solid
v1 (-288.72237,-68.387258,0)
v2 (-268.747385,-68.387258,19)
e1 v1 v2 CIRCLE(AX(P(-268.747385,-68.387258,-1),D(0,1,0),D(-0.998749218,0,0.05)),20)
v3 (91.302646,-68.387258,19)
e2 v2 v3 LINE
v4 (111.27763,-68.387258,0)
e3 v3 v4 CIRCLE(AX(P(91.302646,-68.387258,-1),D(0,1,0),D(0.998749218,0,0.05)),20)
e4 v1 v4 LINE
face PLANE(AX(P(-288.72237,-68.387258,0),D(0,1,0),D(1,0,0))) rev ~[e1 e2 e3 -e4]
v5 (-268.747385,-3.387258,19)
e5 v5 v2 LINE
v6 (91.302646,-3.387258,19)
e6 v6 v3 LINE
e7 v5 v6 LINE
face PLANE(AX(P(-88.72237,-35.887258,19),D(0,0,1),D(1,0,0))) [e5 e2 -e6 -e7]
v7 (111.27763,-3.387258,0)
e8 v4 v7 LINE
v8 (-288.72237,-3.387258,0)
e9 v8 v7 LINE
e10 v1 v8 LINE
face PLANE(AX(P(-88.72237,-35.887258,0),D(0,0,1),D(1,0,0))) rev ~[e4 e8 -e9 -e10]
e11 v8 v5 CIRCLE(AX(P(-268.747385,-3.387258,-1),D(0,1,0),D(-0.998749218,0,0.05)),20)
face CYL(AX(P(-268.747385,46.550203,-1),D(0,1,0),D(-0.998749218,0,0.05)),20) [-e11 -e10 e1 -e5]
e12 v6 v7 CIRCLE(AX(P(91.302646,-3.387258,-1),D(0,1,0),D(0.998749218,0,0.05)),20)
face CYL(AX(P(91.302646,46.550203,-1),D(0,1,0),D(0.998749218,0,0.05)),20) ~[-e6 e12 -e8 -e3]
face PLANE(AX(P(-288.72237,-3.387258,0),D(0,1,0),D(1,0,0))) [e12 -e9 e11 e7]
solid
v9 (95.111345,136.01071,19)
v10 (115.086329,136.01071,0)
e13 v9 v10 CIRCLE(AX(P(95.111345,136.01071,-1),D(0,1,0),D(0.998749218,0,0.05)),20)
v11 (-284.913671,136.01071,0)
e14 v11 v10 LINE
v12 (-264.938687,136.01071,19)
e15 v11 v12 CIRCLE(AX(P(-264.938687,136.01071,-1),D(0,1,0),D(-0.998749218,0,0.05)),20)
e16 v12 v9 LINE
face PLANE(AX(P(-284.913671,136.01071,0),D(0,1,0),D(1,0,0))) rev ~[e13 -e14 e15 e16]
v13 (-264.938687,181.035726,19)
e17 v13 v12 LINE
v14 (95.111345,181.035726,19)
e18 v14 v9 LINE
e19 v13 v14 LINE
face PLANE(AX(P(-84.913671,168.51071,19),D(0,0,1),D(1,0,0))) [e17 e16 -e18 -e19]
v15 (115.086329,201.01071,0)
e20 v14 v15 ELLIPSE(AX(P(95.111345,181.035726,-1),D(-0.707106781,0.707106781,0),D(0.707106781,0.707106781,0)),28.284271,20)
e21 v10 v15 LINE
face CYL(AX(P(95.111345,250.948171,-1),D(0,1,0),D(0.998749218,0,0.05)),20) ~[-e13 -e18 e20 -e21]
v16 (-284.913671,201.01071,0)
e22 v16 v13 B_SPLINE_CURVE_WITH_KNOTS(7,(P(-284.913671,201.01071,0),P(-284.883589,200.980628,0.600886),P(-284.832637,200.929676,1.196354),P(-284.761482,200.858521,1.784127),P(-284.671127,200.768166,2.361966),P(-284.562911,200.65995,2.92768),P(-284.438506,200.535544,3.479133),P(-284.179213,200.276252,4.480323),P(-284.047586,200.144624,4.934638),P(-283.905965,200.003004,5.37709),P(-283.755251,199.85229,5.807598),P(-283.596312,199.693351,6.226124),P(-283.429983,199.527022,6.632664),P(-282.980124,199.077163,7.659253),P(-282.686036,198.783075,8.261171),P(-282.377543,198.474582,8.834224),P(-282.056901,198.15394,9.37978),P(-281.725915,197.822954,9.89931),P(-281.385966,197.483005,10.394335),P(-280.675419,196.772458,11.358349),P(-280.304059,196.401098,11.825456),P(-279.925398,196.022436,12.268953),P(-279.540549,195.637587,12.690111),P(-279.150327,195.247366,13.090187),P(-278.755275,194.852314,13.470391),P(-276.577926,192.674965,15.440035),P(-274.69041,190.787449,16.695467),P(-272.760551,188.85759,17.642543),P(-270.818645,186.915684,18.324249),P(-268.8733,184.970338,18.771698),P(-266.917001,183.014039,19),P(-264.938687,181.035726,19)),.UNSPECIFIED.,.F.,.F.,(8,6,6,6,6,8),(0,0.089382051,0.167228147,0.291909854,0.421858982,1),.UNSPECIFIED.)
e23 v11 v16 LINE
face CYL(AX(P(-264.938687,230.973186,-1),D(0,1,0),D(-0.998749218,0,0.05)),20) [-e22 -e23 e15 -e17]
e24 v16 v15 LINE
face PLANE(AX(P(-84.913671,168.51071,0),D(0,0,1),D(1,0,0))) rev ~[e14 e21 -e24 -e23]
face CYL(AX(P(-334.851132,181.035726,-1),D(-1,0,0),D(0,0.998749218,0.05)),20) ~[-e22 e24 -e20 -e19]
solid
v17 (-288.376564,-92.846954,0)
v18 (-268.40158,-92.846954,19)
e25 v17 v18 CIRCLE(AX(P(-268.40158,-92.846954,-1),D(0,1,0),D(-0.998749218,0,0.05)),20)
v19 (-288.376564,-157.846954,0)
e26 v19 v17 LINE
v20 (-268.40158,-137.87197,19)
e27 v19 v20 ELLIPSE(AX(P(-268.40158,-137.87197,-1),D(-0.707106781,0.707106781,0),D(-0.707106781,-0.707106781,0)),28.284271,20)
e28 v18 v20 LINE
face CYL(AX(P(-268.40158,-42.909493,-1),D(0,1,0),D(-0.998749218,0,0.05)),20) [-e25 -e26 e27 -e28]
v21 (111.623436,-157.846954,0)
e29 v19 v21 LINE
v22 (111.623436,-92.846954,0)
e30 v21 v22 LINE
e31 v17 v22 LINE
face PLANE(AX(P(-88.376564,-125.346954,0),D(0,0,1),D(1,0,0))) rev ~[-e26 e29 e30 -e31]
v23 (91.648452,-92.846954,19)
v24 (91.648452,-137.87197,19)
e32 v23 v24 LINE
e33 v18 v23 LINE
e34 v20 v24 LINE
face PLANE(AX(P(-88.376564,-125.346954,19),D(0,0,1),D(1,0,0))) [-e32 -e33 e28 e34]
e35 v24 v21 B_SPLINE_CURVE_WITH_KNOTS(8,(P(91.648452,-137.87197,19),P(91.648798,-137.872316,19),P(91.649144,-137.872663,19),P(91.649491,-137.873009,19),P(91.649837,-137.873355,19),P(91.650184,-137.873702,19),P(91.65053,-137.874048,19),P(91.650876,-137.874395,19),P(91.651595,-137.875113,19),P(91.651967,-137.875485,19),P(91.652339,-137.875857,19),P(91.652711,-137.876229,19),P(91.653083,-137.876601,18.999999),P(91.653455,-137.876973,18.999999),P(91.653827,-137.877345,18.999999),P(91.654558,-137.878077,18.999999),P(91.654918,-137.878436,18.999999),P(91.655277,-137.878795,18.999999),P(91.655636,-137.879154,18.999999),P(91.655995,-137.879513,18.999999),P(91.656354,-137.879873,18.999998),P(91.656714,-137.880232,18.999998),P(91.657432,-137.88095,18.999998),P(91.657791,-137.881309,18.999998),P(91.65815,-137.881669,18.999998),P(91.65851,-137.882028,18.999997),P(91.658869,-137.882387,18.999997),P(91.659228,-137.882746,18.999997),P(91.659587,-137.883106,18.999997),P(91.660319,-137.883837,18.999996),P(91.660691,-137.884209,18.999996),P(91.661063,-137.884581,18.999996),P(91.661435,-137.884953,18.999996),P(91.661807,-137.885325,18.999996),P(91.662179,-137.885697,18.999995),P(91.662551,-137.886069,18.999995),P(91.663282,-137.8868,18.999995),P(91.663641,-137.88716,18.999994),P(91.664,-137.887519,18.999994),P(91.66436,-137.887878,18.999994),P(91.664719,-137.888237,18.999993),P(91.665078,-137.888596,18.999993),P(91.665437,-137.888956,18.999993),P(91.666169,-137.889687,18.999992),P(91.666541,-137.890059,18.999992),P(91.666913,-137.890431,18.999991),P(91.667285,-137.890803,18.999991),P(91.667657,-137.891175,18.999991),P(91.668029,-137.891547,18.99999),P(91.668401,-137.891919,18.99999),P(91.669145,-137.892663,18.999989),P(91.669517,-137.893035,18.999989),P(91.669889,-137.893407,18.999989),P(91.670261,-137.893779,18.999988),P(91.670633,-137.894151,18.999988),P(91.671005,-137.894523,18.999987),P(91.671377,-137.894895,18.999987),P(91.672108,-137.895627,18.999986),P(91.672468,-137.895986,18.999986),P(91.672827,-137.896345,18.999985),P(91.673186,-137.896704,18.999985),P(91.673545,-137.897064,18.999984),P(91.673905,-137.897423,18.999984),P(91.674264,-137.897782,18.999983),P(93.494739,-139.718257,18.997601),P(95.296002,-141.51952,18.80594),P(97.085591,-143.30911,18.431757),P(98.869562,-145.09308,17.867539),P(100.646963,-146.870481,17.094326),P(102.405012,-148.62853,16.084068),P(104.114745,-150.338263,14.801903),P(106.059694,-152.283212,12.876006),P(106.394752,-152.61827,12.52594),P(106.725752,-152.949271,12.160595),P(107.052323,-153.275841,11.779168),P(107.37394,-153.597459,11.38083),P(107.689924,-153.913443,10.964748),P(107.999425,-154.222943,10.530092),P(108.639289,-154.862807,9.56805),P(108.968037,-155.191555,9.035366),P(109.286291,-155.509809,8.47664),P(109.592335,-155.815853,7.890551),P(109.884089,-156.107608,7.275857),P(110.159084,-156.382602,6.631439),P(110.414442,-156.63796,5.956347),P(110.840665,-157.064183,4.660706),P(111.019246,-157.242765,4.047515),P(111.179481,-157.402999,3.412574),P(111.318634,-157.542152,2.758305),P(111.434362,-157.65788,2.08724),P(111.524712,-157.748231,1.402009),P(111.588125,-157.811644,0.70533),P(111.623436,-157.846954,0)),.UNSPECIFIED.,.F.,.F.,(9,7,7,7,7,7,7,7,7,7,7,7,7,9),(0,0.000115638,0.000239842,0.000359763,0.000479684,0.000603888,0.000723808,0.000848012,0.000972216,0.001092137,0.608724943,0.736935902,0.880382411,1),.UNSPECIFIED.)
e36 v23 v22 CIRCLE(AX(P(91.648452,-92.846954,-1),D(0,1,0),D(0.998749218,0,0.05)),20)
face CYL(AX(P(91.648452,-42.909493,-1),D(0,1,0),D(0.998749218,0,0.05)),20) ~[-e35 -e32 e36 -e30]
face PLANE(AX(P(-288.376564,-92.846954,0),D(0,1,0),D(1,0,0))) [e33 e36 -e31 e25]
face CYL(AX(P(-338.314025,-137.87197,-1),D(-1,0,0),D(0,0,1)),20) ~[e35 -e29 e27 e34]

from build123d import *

# Parameters (mm, degrees)
F0_W         = 400
F0_H         = 65
F1_DEPTH     = 19
F2_W         = 400
F2_H         = 65
F3_DEPTH     = 19
F4_W         = 400
F4_H         = 65
F5_DEPTH     = 19
F6_T1_DEPTH  = 164.8749217772
F7_T1_DEPTH  = 164.8749217772
F8_T1_DEPTH  = 164.8749217772
F9_T1_DEPTH  = 479.8999374217
F10_T1_DEPTH = 144.8999374218
F11_T1_DEPTH = 164.8749217772
F12_T1_DEPTH = 479.8999374217
F13_T1_DEPTH = 144.8999374218


# Not quite as in the source:
# - a fillet or chamfer that OpenCascade refuses, or shapes differently, is made with other operations: its cross-section is extruded or revolved along the edge and cut away or added


with BuildPart() as f1:
    # F0 (on Top) → F1 (new body)
    with BuildSketch(Plane.XY):
        with Locations((-84.9136711072, 168.510709955)):
            Rectangle(F0_W, F0_H)
    extrude(amount=F1_DEPTH)

    # F6: fillet of radius 20 on 1 edges, made by hand

    # F6_s2 → F6_t1 (cut)
    with BuildSketch(Plane.XZ.offset(-250.9481708436)):
        with BuildLine():
            ThreePointArc((115.0863288928, 0), (108.8953932895, 13.4913767462), (95.1113445374, 19))
            Line((95.1113445374, 19), (115.0863288928, 19))
            Line((115.0863288928, 19), (115.0863288928, 0))
        make_face()
    extrude(amount=F6_T1_DEPTH, mode=Mode.SUBTRACT)

    # F12: fillet of radius 20 on 1 edges, made by hand

    # F12_s2 → F12_t1 (cut)
    with BuildSketch(Plane.YZ.offset(-334.8511319958)):
        with BuildLine():
            ThreePointArc((201.010709955, 0), (194.8197743517, 13.4913767462), (181.0357255996, 19))
            Line((181.0357255996, 19), (201.010709955, 19))
            Line((201.010709955, 19), (201.010709955, 0))
        make_face()
    extrude(amount=F12_T1_DEPTH, mode=Mode.SUBTRACT)

    # F13: fillet of radius 20 on 1 edges, made by hand

    # F13_s2 → F13_t1 (cut)
    with BuildSketch(Plane.XZ.offset(-230.9731864882)):
        with BuildLine():
            ThreePointArc((-284.9136711072, 0), (-278.7227355038, 13.4913767462), (-264.9386867517, 19))
            Line((-264.9386867517, 19), (-284.9136711072, 19))
            Line((-284.9136711072, 19), (-284.9136711072, 0))
        make_face()
    extrude(amount=F13_T1_DEPTH, mode=Mode.SUBTRACT)


with BuildPart() as f3:
    # F2 (on Top) → F3 (new body)
    with BuildSketch(Plane.XY):
        with Locations((-88.7223696336, -35.8872577905)):
            Rectangle(F2_W, F2_H)
    extrude(amount=F3_DEPTH)

    # F7: fillet of radius 20 on 1 edges, made by hand

    # F7_s2 → F7_t1 (cut)
    with BuildSketch(Plane.XZ.offset(-46.5502030981)):
        with BuildLine():
            ThreePointArc((111.2776303664, 0), (105.086694763, 13.4913767462), (91.3026460109, 19))
            Line((91.3026460109, 19), (111.2776303664, 19))
            Line((111.2776303664, 19), (111.2776303664, 0))
        make_face()
    extrude(amount=F7_T1_DEPTH, mode=Mode.SUBTRACT)

    # F11: fillet of radius 20 on 1 edges, made by hand

    # F11_s2 → F11_t1 (cut)
    with BuildSketch(Plane.XZ.offset(-46.5502030981)):
        with BuildLine():
            ThreePointArc((-288.7223696336, 0), (-282.5314340303, 13.4913767462), (-268.7473852782, 19))
            Line((-268.7473852782, 19), (-288.7223696336, 19))
            Line((-288.7223696336, 19), (-288.7223696336, 0))
        make_face()
    extrude(amount=F11_T1_DEPTH, mode=Mode.SUBTRACT)


with BuildPart() as f5:
    # F4 (on Top) → F5 (new body)
    with BuildSketch(Plane.XY):
        with Locations((-88.3765639737, -125.3469542844)):
            Rectangle(F4_W, F4_H)
    extrude(amount=F5_DEPTH)

    # F8: fillet of radius 20 on 1 edges, made by hand

    # F8_s2 → F8_t1 (cut)
    with BuildSketch(Plane.XZ.offset(42.9094933958)):
        with BuildLine():
            ThreePointArc((111.6234360263, 0), (105.4325004229, 13.4913767462), (91.6484516708, 19))
            Line((91.6484516708, 19), (111.6234360263, 19))
            Line((111.6234360263, 19), (111.6234360263, 0))
        make_face()
    extrude(amount=F8_T1_DEPTH, mode=Mode.SUBTRACT)

    # F9: fillet of radius 20 on 1 edges, made by hand

    # F9_s2 → F9_t1 (cut)
    with BuildSketch(Plane.YZ.offset(-338.3140248623)):
        with BuildLine():
            ThreePointArc((-137.871969929, 19), (-151.6560186811, 13.4913767462), (-157.8469542844, 0))
            Line((-157.8469542844, 0), (-157.8469542844, 19))
            Line((-157.8469542844, 19), (-137.871969929, 19))
        make_face()
    extrude(amount=F9_T1_DEPTH, mode=Mode.SUBTRACT)

    # F10: fillet of radius 20 on 1 edges, made by hand

    # F10_s2 → F10_t1 (cut)
    with BuildSketch(Plane.XZ.offset(42.9094933958)):
        with BuildLine():
            ThreePointArc((-288.3765639737, 0), (-282.1856283704, 13.4913767462), (-268.4015796183, 19))
            Line((-268.4015796183, 19), (-288.3765639737, 19))
            Line((-288.3765639737, 19), (-288.3765639737, 0))
        make_face()
    extrude(amount=F10_T1_DEPTH, mode=Mode.SUBTRACT)


solid = Compound([f1.part, f3.part, f5.part])
